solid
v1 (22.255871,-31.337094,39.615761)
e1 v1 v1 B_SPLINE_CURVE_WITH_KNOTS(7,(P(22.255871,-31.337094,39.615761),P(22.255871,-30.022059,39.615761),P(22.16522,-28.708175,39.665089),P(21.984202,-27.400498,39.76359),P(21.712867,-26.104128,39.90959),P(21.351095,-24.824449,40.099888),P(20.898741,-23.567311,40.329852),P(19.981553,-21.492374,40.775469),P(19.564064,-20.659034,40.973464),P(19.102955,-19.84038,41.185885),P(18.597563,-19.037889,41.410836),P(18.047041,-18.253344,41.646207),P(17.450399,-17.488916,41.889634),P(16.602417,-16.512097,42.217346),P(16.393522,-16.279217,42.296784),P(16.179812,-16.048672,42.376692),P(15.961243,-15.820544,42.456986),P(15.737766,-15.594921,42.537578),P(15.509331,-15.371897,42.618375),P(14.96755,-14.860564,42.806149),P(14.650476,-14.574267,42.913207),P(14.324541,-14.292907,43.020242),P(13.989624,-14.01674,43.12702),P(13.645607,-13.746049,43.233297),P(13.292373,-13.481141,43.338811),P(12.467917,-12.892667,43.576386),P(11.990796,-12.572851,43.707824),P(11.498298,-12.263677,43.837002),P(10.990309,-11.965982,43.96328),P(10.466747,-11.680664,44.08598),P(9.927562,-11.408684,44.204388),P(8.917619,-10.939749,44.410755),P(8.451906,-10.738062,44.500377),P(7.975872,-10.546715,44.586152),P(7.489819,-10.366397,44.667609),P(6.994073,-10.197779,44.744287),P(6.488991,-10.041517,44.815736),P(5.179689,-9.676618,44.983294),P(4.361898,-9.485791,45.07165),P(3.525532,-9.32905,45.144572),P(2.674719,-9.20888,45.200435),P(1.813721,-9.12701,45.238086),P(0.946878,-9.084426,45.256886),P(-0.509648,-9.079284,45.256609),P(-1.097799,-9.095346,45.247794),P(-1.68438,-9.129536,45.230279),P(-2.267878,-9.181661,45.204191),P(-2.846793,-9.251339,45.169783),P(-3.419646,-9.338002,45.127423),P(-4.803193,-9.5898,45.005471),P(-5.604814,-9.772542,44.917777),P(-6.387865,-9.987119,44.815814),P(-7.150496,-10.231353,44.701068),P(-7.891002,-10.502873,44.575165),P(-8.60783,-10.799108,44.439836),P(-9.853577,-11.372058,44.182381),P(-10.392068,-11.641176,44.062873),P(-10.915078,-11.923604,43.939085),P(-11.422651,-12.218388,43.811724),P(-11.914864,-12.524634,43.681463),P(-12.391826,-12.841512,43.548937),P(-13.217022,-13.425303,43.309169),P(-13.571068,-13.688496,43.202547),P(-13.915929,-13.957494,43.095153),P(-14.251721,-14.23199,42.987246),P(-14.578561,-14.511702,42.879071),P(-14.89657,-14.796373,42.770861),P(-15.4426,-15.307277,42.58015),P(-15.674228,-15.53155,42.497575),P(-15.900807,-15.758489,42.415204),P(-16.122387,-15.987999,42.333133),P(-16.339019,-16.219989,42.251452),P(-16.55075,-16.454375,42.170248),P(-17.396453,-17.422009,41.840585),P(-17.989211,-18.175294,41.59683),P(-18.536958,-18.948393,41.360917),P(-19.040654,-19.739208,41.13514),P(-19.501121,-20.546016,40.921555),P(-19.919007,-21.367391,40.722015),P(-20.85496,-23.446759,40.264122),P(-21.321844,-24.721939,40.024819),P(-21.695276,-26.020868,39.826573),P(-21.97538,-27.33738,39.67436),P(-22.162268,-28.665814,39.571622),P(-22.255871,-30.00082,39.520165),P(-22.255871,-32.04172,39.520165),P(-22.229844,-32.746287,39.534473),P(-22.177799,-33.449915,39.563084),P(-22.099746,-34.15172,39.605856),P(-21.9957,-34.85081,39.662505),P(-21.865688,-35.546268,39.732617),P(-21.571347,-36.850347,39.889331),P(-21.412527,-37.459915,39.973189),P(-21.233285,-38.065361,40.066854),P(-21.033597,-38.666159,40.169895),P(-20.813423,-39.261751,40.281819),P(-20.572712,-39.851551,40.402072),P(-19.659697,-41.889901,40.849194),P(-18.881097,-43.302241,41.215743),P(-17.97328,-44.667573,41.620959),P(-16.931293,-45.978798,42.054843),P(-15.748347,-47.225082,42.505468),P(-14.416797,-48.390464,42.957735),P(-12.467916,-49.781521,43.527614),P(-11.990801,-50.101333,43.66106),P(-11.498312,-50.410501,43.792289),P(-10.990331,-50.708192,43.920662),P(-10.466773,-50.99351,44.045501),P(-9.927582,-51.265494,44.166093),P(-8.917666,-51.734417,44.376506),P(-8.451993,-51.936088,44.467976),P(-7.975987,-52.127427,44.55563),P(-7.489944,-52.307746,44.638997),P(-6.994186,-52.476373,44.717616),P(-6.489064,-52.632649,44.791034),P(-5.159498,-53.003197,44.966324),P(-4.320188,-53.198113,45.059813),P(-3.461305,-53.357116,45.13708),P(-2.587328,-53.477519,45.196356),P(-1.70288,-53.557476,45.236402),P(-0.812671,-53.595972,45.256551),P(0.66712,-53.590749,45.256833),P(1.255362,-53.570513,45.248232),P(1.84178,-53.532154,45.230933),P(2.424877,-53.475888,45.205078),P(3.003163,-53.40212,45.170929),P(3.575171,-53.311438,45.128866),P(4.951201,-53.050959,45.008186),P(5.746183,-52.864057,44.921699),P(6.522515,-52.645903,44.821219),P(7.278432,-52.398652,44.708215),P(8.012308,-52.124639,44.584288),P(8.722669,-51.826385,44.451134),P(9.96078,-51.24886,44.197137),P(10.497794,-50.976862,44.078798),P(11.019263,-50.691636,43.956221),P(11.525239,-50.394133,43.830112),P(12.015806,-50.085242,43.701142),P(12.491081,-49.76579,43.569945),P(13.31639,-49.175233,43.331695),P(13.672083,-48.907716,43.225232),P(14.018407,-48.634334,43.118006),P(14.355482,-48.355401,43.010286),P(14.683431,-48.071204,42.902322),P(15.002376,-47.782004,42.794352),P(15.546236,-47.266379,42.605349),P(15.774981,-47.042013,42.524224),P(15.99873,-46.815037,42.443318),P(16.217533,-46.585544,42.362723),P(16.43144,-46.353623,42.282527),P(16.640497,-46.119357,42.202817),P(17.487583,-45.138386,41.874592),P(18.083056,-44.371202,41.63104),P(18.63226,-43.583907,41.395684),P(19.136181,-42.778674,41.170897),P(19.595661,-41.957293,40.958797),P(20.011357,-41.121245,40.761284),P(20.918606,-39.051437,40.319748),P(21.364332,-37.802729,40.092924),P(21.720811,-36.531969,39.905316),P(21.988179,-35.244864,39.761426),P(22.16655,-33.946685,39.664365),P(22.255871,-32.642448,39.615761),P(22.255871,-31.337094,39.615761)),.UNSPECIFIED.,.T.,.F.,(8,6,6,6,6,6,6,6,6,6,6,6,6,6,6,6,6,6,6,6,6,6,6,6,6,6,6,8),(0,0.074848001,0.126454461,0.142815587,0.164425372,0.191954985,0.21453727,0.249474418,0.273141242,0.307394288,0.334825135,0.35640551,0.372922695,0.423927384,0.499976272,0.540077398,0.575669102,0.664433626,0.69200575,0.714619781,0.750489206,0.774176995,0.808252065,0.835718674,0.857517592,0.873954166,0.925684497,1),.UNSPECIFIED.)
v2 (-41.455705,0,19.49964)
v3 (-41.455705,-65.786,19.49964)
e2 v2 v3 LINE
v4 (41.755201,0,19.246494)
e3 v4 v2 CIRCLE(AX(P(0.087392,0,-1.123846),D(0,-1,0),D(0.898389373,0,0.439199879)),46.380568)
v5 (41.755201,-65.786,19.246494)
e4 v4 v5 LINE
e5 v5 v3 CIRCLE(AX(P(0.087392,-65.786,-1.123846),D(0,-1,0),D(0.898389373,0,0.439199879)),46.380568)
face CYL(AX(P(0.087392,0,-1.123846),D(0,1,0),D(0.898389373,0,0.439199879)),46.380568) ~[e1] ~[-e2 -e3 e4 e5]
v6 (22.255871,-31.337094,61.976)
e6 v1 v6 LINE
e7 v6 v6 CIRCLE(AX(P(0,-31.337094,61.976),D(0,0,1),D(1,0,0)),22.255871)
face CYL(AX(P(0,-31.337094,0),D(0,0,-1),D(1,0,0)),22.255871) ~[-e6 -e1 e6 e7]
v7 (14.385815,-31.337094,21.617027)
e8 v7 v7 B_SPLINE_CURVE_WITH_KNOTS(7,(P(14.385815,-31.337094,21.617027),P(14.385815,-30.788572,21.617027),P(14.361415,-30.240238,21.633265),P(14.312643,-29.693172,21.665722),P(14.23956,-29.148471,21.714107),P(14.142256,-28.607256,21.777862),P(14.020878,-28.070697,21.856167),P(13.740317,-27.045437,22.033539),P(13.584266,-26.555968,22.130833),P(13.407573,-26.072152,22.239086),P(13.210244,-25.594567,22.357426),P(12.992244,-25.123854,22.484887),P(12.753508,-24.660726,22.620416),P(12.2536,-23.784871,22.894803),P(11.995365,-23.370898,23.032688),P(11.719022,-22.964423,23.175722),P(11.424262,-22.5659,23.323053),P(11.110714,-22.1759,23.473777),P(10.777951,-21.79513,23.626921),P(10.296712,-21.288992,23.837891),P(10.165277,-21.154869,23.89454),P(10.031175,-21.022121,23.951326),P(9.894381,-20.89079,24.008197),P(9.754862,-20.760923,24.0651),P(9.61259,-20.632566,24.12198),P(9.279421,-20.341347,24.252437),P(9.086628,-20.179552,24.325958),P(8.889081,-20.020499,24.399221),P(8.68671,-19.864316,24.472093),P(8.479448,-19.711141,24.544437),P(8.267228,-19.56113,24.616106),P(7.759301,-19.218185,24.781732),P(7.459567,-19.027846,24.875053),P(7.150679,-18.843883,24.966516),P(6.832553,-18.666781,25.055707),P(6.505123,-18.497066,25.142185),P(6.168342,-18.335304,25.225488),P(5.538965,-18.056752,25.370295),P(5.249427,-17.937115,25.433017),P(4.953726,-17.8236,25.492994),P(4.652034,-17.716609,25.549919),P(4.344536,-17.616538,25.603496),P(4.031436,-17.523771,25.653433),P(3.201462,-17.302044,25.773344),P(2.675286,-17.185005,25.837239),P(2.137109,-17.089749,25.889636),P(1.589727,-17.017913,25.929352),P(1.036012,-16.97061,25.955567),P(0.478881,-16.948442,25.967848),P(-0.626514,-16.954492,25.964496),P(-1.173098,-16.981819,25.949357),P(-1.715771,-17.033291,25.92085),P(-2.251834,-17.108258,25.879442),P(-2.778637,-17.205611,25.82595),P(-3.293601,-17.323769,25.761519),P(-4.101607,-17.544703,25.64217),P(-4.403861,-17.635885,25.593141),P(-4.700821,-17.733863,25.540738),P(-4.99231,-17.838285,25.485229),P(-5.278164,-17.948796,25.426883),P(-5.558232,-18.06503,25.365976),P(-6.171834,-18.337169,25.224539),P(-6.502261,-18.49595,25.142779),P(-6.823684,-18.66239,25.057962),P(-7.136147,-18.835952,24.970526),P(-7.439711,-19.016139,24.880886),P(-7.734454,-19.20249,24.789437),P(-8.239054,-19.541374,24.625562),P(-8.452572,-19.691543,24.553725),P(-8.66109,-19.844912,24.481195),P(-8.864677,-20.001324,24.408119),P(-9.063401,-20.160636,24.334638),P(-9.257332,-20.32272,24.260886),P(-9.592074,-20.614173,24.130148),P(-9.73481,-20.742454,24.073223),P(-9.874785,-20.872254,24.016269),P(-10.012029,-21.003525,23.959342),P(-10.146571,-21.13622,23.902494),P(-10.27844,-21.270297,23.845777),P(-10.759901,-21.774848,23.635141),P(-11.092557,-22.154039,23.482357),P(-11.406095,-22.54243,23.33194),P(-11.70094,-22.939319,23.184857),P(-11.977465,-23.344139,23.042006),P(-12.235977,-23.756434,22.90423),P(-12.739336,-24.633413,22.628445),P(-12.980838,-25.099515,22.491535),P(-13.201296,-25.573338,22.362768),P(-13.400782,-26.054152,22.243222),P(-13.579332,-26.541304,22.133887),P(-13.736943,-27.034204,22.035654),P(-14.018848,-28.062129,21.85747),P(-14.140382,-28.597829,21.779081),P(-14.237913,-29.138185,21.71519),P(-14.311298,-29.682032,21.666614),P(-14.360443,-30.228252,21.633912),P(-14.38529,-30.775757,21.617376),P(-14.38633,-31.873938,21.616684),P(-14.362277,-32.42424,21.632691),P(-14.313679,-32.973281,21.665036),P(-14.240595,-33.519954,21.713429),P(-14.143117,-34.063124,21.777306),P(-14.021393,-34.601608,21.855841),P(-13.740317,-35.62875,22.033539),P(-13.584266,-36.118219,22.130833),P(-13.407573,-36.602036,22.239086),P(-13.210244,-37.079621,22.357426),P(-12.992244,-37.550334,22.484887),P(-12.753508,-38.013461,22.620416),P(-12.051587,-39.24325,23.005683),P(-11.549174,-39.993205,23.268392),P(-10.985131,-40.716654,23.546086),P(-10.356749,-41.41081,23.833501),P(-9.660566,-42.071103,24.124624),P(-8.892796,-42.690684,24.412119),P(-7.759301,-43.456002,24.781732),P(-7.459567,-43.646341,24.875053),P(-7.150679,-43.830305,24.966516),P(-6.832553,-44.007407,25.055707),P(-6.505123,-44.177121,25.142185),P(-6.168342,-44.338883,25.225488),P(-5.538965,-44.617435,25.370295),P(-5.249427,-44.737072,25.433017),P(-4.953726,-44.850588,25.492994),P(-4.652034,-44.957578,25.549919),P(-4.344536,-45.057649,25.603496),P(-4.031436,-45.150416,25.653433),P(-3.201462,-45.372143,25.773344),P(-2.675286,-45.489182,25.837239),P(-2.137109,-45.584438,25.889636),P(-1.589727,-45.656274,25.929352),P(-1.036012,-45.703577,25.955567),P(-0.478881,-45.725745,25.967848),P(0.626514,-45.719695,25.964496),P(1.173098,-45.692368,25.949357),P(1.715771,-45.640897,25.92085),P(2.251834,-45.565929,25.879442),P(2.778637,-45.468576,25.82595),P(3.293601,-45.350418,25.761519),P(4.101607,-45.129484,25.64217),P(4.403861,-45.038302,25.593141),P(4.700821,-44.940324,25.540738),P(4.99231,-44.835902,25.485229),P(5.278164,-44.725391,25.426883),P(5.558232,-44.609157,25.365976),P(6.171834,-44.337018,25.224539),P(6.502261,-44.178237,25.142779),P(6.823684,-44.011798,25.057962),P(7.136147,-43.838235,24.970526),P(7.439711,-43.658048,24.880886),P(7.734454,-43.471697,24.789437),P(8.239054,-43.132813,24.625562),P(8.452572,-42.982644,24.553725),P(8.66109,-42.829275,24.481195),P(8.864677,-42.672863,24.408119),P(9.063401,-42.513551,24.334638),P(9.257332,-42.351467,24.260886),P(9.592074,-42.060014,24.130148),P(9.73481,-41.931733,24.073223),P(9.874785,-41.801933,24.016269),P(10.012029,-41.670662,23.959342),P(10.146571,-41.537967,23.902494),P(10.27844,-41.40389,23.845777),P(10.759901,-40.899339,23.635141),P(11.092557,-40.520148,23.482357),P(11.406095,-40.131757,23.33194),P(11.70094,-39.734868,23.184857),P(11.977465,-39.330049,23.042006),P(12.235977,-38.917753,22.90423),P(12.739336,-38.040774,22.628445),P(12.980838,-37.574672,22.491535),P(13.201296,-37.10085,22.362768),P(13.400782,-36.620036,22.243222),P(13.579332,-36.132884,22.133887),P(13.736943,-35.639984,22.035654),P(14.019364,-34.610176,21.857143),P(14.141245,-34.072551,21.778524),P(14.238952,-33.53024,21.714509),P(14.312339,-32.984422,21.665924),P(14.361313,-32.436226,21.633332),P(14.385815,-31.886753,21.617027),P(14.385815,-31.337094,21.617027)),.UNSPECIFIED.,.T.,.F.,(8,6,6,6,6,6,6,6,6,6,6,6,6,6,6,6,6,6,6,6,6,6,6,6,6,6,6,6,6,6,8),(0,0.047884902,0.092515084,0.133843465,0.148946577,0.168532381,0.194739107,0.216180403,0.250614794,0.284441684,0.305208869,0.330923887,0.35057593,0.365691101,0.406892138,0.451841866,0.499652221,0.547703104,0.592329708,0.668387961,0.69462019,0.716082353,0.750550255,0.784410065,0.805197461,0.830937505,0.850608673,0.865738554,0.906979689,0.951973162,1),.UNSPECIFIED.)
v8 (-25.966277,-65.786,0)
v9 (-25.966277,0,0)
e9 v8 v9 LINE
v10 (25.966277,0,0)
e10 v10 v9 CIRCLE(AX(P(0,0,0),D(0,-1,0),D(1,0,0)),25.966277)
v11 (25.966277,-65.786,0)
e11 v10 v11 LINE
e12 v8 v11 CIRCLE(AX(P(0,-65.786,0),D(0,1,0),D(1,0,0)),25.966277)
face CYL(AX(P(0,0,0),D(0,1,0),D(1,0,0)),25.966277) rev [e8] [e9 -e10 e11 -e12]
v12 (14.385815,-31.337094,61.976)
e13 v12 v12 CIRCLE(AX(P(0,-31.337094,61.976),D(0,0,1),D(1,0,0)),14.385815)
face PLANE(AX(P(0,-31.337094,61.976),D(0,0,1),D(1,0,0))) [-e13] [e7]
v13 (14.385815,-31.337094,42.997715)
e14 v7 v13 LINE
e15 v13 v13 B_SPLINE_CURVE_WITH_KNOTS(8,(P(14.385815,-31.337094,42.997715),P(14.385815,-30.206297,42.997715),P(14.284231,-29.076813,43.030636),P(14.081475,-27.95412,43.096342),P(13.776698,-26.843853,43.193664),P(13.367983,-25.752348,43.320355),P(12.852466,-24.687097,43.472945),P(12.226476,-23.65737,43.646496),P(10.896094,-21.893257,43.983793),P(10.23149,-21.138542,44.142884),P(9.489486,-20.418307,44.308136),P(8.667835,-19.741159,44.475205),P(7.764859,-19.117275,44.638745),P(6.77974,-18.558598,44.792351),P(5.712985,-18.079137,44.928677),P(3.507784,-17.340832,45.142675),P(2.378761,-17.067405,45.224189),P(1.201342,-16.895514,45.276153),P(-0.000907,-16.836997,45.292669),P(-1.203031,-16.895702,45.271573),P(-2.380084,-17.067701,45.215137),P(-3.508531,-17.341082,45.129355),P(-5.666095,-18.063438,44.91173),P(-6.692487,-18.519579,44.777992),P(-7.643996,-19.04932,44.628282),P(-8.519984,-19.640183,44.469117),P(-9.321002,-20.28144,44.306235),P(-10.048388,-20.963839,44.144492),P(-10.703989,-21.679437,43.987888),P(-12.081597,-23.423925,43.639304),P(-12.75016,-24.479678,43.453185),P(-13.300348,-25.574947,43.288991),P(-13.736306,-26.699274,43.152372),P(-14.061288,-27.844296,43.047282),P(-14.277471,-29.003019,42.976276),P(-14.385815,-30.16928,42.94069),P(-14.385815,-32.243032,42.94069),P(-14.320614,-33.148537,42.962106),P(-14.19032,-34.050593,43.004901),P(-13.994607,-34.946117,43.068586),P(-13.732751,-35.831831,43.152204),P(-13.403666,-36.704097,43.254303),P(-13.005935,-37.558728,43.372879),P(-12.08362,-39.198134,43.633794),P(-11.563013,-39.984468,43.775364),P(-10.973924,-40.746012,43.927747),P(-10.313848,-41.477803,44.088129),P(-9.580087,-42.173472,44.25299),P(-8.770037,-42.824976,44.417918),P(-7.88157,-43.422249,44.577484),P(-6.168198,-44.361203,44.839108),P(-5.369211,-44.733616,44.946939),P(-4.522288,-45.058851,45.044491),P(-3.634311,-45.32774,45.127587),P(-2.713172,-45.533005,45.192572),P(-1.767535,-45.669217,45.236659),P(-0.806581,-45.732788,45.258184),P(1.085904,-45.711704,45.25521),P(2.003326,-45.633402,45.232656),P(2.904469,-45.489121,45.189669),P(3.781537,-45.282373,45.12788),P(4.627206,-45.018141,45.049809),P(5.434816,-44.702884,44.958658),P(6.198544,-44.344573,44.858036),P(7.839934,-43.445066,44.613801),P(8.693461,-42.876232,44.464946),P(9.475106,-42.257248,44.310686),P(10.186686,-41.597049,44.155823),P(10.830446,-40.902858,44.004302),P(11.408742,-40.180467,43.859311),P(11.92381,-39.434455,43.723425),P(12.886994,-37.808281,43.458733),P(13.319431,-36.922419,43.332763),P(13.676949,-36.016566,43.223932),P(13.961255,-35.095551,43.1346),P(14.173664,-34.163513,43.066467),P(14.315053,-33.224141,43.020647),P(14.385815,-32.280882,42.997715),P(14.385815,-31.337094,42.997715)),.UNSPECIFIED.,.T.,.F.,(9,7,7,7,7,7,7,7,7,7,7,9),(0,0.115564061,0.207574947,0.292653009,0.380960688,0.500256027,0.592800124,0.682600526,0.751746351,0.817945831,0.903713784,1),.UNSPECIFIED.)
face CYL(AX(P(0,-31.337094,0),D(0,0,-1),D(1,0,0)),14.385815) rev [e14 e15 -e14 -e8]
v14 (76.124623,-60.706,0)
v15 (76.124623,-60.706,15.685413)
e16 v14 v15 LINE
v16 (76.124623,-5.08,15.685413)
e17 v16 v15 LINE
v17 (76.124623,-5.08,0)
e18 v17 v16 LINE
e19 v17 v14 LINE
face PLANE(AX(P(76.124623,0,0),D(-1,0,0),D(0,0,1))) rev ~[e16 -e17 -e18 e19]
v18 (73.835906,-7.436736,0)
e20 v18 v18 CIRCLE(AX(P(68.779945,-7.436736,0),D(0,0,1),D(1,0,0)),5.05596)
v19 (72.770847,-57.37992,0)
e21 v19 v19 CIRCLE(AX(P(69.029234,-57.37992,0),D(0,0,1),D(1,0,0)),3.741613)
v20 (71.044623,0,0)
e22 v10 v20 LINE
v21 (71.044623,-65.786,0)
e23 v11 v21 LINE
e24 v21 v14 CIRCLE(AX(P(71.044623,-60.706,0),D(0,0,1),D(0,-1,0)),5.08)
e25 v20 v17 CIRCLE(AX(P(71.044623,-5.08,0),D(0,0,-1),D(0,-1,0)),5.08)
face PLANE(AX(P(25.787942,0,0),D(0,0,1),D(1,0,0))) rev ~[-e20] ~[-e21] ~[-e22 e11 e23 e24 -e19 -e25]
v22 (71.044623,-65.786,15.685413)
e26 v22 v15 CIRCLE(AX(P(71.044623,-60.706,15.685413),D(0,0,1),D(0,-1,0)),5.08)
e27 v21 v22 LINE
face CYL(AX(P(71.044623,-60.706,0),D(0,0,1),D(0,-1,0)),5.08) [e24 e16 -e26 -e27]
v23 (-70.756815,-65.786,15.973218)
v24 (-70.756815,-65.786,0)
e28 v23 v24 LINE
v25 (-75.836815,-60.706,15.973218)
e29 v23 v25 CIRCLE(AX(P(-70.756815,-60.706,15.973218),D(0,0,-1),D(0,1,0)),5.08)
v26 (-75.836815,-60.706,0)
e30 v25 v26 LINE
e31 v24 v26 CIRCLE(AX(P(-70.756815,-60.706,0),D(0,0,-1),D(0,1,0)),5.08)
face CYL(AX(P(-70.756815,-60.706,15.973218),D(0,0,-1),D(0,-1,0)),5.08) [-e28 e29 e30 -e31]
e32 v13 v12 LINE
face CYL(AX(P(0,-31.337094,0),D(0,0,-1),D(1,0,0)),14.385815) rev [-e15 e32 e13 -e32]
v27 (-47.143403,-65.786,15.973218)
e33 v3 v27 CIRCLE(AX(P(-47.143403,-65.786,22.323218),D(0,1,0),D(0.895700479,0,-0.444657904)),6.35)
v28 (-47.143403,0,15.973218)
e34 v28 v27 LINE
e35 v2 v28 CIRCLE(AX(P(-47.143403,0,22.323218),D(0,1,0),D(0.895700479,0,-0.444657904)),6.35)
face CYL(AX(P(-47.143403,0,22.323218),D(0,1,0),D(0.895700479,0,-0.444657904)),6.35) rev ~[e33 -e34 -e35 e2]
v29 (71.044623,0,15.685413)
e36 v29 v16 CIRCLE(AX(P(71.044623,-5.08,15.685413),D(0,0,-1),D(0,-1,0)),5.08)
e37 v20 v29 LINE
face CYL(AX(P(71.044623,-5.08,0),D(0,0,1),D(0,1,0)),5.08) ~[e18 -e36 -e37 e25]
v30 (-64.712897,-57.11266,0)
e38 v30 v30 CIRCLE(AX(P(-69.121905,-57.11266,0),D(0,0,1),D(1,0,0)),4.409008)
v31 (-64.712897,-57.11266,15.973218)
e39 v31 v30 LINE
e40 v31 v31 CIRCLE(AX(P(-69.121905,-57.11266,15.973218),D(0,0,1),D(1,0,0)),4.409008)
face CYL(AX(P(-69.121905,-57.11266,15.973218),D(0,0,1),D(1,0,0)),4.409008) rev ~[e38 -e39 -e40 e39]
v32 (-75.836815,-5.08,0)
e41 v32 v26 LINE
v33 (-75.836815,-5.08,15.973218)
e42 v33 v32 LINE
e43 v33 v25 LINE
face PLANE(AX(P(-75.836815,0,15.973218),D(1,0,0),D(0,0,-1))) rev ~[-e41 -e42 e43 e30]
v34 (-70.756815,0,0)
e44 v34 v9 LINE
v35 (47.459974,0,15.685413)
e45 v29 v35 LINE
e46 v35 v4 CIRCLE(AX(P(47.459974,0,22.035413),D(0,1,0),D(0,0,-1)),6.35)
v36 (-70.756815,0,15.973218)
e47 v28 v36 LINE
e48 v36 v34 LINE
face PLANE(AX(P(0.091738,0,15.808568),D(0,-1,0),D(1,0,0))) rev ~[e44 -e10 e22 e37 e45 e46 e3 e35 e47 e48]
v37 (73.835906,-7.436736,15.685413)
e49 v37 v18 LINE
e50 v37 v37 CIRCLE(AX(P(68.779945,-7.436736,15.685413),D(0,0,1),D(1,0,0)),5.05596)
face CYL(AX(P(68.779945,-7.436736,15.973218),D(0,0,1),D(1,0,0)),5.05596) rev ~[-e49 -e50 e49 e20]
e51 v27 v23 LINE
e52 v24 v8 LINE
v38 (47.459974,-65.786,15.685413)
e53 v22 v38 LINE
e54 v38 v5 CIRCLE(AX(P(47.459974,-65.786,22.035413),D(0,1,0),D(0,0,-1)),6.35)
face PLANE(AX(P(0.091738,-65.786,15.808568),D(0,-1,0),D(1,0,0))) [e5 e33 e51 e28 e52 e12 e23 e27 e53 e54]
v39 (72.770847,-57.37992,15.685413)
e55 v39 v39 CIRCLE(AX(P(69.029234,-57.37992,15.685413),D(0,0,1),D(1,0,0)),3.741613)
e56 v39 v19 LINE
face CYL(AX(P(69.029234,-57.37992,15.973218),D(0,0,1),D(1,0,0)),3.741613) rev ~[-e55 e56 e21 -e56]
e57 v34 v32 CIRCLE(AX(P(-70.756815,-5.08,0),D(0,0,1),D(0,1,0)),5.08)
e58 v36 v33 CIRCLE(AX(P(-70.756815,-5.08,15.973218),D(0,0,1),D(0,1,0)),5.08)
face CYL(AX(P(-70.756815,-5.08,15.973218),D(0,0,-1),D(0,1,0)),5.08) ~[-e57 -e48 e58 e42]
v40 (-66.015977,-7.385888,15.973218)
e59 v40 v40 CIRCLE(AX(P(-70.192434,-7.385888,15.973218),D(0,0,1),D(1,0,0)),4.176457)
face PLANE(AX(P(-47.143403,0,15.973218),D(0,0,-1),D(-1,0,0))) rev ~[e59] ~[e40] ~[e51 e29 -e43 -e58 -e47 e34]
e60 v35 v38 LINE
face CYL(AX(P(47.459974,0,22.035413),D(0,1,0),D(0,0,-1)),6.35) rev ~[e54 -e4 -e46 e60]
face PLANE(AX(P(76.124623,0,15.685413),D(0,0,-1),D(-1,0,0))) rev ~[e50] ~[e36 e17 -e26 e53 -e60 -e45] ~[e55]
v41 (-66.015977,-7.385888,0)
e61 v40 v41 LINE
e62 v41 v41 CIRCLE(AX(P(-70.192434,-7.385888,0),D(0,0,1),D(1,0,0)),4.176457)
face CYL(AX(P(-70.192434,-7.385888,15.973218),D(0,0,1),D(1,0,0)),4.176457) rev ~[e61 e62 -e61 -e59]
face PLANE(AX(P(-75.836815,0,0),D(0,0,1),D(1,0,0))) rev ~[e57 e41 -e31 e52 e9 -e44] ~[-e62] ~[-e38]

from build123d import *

# Parameters (mm, degrees)
F1_DEPTH  = 65.786
F2_R      = 4.1764569431
F2_R_2    = 4.4090075628
F3_DEPTH  = 25.4
F2_R_3    = 5.0559602499
F2_R_4    = 3.7416125294
F4_DEPTH  = 25.4
F5_R      = 14.3858151817
F6_DEPTH  = 68.072
F5_R_2    = 22.255871479
F7_DEPTH  = 61.976
F8_R      = 5.08
F9_R      = 25.9662767353
F10_DEPTH = 113.792


# Not quite as in the source:
# - a feature names something its author has since deleted; it is built from what else it names


with BuildPart() as f1:
    # F0 (on Front) → F1 (new body)
    with BuildSketch(Plane.XZ):
        with BuildLine():
            ThreePointArc((-25.7879418184, 0), (0, 25.7879418184), (25.7879418184, 0))
            Line((25.7879418184, 0), (76.1246234179, 0))
            Line((76.1246234179, 0), (76.1246234179, 15.6854130328))
            Line((76.1246234179, 15.6854130328), (47.4599736899, 15.6854130328))
            ThreePointArc((47.4599736899, 15.6854130328), (44.0974699454, 16.6487565032), (41.7552011698, 19.2464937988))
            ThreePointArc((41.7552011698, 19.2464937988), (0.2284915035, 45.2565071244), (-41.4557046581, 19.4996400932))
            ThreePointArc((-41.4557046581, 19.4996400932), (-43.7973018606, 16.9263567372), (-47.1434027, 15.9732177854))
            Line((-47.1434027, 15.9732177854), (-75.83681494, 15.9732177854))
            Line((-75.83681494, 15.9732177854), (-75.83681494, 0))
            Line((-75.83681494, 0), (-25.7879418184, 0))
        make_face()
    extrude(amount=F1_DEPTH)

    # F2 (on face) → F3 (cut)
    with BuildSketch(Plane.XY.offset(15.9732177854)):
        with Locations((-70.1924338937, -7.3858876713)):
            Circle(F2_R)
        with Locations((-69.1219046712, -57.112660259)):
            Circle(F2_R_2)
    extrude(amount=-F3_DEPTH, mode=Mode.SUBTRACT)

    # F2 (on face) → F4 (cut)
    with BuildSketch(Plane.XY.offset(15.9732177854)):
        with Locations((68.7799453735, -7.4367355555)):
            Circle(F2_R_3)
        with Locations((69.0292343497, -57.3799200356)):
            Circle(F2_R_4)
    extrude(amount=-F4_DEPTH, mode=Mode.SUBTRACT)

    # F5 (on Top) → F6 (cut)
    with BuildSketch(Plane.XY):
        with Locations((0, -31.3370935619)):
            Circle(F5_R)
    extrude(amount=F6_DEPTH, mode=Mode.SUBTRACT)

    # F5 (on Top) → F7 (join)
    with BuildSketch(Plane.XY):
        with Locations((0, -31.3370935619)):
            Circle(F5_R_2)
        with Locations((0, -31.3370935619)):
            Circle(F5_R, mode=Mode.SUBTRACT)
    extrude(amount=F7_DEPTH)

    # F8
    f8_edges = [f1.edges().sort_by_distance(p)[0] for p in [
        (76.124623, -65.786, 7.842707),
        (76.124623, 0, 7.842707),
        (-75.836815, 0, 7.986609),
        (-75.836815, -65.786, 7.986609),
    ]]
    fillet(f8_edges, radius=F8_R)

    # F9 (on Front) → F10 (cut)
    with BuildSketch(Plane.XZ):
        Circle(F9_R)
    extrude(amount=F10_DEPTH, mode=Mode.SUBTRACT)


solid = f1.part
